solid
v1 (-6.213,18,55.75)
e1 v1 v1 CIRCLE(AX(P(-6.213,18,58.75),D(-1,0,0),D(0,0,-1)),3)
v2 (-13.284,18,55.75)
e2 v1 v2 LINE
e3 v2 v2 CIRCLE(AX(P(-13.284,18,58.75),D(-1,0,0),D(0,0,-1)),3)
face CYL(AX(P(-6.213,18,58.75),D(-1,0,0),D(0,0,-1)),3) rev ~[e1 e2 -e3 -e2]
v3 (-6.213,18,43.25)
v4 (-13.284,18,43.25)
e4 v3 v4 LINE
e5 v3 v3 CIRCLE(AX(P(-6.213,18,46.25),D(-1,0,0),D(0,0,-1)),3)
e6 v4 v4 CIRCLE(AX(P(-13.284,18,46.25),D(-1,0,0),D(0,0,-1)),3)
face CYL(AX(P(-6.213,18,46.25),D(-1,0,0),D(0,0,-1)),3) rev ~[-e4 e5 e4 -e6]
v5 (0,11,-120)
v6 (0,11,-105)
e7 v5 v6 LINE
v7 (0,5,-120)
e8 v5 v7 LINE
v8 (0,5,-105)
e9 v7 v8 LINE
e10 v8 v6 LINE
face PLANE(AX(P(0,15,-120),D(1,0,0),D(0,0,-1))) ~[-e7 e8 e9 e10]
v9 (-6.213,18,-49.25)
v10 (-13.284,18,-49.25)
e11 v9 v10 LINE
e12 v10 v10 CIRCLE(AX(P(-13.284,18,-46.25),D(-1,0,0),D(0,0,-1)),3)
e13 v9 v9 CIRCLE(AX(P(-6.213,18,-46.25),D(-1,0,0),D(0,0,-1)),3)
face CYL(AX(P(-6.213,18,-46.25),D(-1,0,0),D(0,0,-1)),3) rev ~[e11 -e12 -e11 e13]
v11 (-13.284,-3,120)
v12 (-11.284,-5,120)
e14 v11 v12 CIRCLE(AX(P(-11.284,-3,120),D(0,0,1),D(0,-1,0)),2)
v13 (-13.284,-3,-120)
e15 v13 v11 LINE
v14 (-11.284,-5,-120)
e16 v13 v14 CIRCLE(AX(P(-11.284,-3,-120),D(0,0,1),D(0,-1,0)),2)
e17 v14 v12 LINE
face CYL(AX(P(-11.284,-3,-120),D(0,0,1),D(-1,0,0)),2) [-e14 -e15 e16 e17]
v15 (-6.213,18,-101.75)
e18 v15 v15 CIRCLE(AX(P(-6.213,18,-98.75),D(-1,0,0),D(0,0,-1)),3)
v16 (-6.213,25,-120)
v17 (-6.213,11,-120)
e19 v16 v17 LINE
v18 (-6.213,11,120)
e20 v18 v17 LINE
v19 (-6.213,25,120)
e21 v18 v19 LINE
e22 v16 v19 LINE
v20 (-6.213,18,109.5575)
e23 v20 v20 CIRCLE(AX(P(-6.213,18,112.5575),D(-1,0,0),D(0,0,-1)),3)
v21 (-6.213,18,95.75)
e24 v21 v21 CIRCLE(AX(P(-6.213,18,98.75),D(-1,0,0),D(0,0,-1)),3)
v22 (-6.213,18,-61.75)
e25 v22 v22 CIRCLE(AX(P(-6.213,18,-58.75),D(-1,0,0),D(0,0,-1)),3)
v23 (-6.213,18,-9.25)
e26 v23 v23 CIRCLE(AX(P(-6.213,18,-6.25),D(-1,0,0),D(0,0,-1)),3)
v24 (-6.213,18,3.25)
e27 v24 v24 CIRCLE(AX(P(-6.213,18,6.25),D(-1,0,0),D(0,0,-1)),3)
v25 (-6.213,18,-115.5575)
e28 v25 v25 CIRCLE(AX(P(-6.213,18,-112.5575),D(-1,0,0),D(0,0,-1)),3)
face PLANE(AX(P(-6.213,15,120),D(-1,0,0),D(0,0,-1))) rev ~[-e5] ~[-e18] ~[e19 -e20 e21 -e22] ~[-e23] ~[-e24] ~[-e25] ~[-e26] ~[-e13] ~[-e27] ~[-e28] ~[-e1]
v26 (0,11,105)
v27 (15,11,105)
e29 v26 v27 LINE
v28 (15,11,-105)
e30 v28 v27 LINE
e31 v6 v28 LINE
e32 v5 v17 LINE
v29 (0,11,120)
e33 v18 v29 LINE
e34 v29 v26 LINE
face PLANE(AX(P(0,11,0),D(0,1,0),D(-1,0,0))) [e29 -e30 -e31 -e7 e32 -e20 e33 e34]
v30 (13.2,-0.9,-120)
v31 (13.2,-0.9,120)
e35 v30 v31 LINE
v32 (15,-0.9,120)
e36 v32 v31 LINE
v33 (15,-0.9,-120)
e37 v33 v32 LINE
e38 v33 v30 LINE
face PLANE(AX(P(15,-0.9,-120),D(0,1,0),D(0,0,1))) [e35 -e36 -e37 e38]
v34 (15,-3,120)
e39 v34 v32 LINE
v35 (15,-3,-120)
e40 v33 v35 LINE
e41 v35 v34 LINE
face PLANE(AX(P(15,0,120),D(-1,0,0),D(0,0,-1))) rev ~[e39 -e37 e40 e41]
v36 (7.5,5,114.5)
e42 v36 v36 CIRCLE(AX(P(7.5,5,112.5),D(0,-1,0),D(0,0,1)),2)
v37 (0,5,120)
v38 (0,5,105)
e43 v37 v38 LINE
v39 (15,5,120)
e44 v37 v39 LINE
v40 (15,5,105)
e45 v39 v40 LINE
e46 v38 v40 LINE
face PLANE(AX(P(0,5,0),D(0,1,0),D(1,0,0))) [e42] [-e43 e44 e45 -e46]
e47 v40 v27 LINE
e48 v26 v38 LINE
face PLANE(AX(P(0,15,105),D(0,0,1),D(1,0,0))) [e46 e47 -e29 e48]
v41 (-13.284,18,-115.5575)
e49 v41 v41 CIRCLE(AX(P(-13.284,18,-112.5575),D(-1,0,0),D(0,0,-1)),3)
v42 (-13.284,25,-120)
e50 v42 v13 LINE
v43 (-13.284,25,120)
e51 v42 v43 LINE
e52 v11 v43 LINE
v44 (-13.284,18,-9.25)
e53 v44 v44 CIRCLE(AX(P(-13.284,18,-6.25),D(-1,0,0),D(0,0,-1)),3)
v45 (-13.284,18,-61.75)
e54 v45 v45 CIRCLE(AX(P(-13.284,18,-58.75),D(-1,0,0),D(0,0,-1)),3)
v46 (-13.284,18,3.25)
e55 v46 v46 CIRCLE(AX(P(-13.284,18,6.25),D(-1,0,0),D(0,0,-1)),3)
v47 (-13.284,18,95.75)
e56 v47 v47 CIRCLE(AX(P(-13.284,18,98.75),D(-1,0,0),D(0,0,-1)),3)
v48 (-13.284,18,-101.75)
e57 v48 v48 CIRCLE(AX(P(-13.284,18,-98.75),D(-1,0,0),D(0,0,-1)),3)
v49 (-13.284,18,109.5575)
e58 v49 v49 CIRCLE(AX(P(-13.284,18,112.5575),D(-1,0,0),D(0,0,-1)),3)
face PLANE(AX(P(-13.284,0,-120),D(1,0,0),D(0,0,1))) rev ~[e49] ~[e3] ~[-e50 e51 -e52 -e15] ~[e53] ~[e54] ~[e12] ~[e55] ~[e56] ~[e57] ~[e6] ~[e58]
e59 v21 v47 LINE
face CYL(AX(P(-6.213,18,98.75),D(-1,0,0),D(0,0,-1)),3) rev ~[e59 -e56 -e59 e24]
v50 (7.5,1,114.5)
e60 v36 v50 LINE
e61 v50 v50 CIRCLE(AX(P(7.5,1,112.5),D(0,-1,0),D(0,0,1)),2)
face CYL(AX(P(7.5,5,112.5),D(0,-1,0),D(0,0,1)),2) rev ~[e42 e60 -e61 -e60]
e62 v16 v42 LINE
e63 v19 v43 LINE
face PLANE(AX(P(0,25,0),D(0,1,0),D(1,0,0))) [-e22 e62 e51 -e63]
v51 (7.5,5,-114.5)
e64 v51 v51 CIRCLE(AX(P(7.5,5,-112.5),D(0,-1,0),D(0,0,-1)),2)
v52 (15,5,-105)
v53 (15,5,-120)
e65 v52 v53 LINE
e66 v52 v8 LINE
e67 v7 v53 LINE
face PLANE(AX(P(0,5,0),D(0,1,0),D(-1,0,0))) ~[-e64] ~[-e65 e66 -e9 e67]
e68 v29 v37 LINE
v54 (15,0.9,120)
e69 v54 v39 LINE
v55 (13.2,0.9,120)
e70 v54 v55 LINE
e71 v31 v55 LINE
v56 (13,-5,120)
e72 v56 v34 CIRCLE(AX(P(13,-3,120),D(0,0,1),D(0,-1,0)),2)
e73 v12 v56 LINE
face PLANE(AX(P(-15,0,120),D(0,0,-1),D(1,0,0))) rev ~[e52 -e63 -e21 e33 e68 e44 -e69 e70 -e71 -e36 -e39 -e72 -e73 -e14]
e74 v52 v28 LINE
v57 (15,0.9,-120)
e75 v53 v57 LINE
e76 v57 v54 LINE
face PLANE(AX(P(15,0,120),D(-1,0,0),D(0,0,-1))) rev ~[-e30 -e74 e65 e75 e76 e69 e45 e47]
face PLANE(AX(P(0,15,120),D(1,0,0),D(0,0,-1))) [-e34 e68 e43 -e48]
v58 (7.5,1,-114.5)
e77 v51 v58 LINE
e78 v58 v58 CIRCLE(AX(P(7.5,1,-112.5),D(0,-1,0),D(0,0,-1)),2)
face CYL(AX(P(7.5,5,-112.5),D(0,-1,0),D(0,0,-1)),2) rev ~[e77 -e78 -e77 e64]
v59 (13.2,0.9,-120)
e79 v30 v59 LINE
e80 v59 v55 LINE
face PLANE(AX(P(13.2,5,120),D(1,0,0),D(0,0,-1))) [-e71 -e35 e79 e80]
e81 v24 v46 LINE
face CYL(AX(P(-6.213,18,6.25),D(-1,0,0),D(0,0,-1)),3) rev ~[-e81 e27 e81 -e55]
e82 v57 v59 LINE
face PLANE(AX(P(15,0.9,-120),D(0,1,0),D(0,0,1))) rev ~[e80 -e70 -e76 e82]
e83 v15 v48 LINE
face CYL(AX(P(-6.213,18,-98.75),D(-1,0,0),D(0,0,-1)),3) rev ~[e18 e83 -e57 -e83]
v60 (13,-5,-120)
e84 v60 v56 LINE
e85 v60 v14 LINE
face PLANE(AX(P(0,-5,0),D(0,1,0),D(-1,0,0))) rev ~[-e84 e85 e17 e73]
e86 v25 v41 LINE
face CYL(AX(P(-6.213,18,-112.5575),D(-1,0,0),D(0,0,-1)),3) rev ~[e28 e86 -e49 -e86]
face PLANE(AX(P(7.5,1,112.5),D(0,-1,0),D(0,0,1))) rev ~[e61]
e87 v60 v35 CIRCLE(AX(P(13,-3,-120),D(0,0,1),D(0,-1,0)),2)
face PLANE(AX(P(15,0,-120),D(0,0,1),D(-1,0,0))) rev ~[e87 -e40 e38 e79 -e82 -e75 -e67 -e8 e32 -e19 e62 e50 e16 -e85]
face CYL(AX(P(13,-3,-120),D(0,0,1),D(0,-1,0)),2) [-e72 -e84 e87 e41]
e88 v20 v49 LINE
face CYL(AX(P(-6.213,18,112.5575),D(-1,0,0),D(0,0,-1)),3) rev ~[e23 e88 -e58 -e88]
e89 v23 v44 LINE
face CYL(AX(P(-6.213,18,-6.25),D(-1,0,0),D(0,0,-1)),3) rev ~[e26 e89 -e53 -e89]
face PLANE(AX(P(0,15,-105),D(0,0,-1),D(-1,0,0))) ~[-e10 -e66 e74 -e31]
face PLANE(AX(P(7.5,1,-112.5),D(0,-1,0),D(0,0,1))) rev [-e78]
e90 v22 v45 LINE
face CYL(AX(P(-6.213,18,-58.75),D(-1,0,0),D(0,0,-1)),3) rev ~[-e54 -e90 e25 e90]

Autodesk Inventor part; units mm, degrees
ref_plane "YZ Plane" through (0, 0, 0) normal (1, 0, 0) x (0, 1, 0)
ref_plane "XZ Plane" through (0, 0, 0) normal (0, 1, 0) x (-1, 0, 0)
ref_plane "XY Plane" through (0, 0, 0) normal (0, 0, 1) x (1, 0, 0)
sketch "Sketch1" plane through (0, 0, 0) normal (0, 1, 0) x (-1, 0, 0)
  line L0 (15, 120) -> (-15, 120)
  line L1 (-15, 120) -> (-15, -120)
  line L2 (-15, -120) -> (15, -120)
  line L3 (15, -120) -> (15, 120)
  point P0 (0, 0)
  point P1 (0, 120)
  point P2 (15, 0)
  dimension "d0" = 240
  dimension "d1" = 30
extrude "Extrusion1" add sketch "Sketch1" along normal blind 15
sketch "Sketch2" plane through (0, 15, 0) normal (0, 1, 0) x (1, 0, 0)
  line L0 (-15, 120) -> (-15, -120) projected
  line L1 (15, 120) -> (-15, 120) projected
  line L2 (-15, -120) -> (-5, -120)
  line L3 (-5, -120) -> (-5, 120)
  line L4 (-5, 120) -> (-15, 120)
  line L5 (-15, 120) -> (-15, -120)
  point P0 (0, 0)
  dimension "d4" = 10
extrude "Extrusion2" add sketch "Sketch2" along normal blind 10
sketch "Sketch4" plane through (0, 15, 0) normal (0, 1, 0) x (1, 0, 0)
  line L0 (15, 120) -> (-5, 120) projected
  line L1 (15, -120) -> (15, 120) projected
  line L2 (15, -120) -> (0, -120)
  line L3 (0, -120) -> (0, -105)
  line L4 (0, -105) -> (15, -105)
  line L5 (15, -105) -> (15, -120)
  point P0 (0, 0)
  dimension "d42" = 15
  dimension "d43" = 15
extrude "Extrusion3" cut sketch "Sketch4" against normal blind 10
sketch "Sketch5" plane through (0, 5, 0) normal (0, 1, 0) x (1, 0, 0)
  line L0 (15, -120) -> (15, 120) projected
  line L1 (0, -105) -> (15, -105) projected
  line L2 (15, -120) -> (0, -105) construction
  line L3 (-15, -120) -> (15, -120) projected
  line L4 (0, -120) -> (15, -105) construction
  point P0 (0, 0)
  point P1 (7.5, -112.5)
  point P2 (7.5, -112.5)
hole "Hole2" at (7.5, 5, 112.5) direction (0, -1, 0) diameter 4 depth 4
mirror "Mirror1" about plane through (0, 0, 0) normal (0, 0, 1) of "Extrusion3", "Hole2"
move faces "Move1" translate (0, -5, 0) faces at (5, 0, 40)
move faces "Move3" translate (1.716, 0, 0) faces at (-15, 5, -40)
move faces "Move4" translate (-1.213, 0, 0) faces at (-5, 18.3333, 40)
move faces "Move5" translate (0, -4, 0) faces at (10, 15, 35)
sketch "Sketch6" plane through (-6.213, 25, 120) normal (1, 0, 0) x (0, 0, -1)
  point P0 (120, -25)
sketch "Sketch7" plane through (-6.213, 25, 120) normal (1, 0, 0) x (0, 0, -1)
  line L0 (0, 0) -> (240, 0) projected
  line L1 (225, -14) -> (240, -14) projected
  line L2 (0, -14) -> (0, 0) projected
  line L3 (0, -30) -> (0, 0) projected
  line L4 (240, -30) -> (240, 0) projected
  point P0 (120, -25)
  point P1 (218.75, -7)
  point P2 (178.75, -7)
  point P3 (166.25, -7)
  point P4 (126.25, -7)
  point P5 (113.75, -7)
  point P6 (73.75, -7)
  point P7 (61.25, -7)
  point P8 (0, -7)
  point P9 (21.25, -7)
  point P10 (7.4425, -7)
  point P11 (0, -7)
  point P12 (0, -7)
  point P13 (232.5575, -7)
  dimension "d82" = 40
  dimension "d83" = 12.5
  dimension "d84" = 40
  dimension "d85" = 12.5
  dimension "d86" = 40
  dimension "d87" = 12.5
  dimension "d91" = 7
  dimension "d93" = 40
  dimension "d99" = 14
  dimension "d100" = 21.25
  dimension "d101" = 7.4425
  dimension "d103" = 7.4425
hole "Hole3" at (-6.213, 18, 58.75) at (-6.213, 18, 46.25) at (-6.213, 18, 6.25) at (-6.213, 18, -6.25) at (-6.213, 18, -46.25) at (-6.213, 18, -58.75) at (-6.213, 18, -98.75) at (-6.213, 18, 98.75) at (-6.213, 18, -112.5575) at (-6.213, 18, 112.5575) direction (-1, 0, 0) diameter 6 end through all
sketch "Sketch8" plane through (15, 5, 120) normal (1, 0, 0) x (0, 0, -1)
  line L0 (240, -10) -> (240, 20) projected
  line L1 (0, -10) -> (0, 20) projected
  line L2 (240, -10) -> (240, 0) projected
  line L3 (203.8731, -5) -> (-4.7144, -5)
  line L4 (240, -5.9) -> (0, -5.9)
  line L5 (240, -4.1) -> (0, -4.1)
  line L6 (240, -4.1) -> (240, -5.9)
  line L7 (0, -4.1) -> (0, -5.9)
  point P0 (120, -5)
  point P1 (240, -5)
  point P2 (99.5794, -5)
  point P3 (240, -5)
  point P4 (0, -4.1)
  dimension "d78" = 1.8
extrude "Extrusion4" cut sketch "Sketch8" against normal blind 1.8
fillet "Fillet1" radius 2 1 edges at (-13.284, -5, 0)
fillet "Fillet2" radius 2 1 edges at (15, -5, 0)
equation "\"d84\" = d82"
equation "\"d85\" = d83"
equation "\"d86\" = d84"
equation "\"d87\" = d85"
equation "\"d91\" = 0.5 * d99"
equation "\"d93\" = d82"
equation "\"d103\" = d101"
properties part number "horizontal_Edge" material "ABS Plastic"
